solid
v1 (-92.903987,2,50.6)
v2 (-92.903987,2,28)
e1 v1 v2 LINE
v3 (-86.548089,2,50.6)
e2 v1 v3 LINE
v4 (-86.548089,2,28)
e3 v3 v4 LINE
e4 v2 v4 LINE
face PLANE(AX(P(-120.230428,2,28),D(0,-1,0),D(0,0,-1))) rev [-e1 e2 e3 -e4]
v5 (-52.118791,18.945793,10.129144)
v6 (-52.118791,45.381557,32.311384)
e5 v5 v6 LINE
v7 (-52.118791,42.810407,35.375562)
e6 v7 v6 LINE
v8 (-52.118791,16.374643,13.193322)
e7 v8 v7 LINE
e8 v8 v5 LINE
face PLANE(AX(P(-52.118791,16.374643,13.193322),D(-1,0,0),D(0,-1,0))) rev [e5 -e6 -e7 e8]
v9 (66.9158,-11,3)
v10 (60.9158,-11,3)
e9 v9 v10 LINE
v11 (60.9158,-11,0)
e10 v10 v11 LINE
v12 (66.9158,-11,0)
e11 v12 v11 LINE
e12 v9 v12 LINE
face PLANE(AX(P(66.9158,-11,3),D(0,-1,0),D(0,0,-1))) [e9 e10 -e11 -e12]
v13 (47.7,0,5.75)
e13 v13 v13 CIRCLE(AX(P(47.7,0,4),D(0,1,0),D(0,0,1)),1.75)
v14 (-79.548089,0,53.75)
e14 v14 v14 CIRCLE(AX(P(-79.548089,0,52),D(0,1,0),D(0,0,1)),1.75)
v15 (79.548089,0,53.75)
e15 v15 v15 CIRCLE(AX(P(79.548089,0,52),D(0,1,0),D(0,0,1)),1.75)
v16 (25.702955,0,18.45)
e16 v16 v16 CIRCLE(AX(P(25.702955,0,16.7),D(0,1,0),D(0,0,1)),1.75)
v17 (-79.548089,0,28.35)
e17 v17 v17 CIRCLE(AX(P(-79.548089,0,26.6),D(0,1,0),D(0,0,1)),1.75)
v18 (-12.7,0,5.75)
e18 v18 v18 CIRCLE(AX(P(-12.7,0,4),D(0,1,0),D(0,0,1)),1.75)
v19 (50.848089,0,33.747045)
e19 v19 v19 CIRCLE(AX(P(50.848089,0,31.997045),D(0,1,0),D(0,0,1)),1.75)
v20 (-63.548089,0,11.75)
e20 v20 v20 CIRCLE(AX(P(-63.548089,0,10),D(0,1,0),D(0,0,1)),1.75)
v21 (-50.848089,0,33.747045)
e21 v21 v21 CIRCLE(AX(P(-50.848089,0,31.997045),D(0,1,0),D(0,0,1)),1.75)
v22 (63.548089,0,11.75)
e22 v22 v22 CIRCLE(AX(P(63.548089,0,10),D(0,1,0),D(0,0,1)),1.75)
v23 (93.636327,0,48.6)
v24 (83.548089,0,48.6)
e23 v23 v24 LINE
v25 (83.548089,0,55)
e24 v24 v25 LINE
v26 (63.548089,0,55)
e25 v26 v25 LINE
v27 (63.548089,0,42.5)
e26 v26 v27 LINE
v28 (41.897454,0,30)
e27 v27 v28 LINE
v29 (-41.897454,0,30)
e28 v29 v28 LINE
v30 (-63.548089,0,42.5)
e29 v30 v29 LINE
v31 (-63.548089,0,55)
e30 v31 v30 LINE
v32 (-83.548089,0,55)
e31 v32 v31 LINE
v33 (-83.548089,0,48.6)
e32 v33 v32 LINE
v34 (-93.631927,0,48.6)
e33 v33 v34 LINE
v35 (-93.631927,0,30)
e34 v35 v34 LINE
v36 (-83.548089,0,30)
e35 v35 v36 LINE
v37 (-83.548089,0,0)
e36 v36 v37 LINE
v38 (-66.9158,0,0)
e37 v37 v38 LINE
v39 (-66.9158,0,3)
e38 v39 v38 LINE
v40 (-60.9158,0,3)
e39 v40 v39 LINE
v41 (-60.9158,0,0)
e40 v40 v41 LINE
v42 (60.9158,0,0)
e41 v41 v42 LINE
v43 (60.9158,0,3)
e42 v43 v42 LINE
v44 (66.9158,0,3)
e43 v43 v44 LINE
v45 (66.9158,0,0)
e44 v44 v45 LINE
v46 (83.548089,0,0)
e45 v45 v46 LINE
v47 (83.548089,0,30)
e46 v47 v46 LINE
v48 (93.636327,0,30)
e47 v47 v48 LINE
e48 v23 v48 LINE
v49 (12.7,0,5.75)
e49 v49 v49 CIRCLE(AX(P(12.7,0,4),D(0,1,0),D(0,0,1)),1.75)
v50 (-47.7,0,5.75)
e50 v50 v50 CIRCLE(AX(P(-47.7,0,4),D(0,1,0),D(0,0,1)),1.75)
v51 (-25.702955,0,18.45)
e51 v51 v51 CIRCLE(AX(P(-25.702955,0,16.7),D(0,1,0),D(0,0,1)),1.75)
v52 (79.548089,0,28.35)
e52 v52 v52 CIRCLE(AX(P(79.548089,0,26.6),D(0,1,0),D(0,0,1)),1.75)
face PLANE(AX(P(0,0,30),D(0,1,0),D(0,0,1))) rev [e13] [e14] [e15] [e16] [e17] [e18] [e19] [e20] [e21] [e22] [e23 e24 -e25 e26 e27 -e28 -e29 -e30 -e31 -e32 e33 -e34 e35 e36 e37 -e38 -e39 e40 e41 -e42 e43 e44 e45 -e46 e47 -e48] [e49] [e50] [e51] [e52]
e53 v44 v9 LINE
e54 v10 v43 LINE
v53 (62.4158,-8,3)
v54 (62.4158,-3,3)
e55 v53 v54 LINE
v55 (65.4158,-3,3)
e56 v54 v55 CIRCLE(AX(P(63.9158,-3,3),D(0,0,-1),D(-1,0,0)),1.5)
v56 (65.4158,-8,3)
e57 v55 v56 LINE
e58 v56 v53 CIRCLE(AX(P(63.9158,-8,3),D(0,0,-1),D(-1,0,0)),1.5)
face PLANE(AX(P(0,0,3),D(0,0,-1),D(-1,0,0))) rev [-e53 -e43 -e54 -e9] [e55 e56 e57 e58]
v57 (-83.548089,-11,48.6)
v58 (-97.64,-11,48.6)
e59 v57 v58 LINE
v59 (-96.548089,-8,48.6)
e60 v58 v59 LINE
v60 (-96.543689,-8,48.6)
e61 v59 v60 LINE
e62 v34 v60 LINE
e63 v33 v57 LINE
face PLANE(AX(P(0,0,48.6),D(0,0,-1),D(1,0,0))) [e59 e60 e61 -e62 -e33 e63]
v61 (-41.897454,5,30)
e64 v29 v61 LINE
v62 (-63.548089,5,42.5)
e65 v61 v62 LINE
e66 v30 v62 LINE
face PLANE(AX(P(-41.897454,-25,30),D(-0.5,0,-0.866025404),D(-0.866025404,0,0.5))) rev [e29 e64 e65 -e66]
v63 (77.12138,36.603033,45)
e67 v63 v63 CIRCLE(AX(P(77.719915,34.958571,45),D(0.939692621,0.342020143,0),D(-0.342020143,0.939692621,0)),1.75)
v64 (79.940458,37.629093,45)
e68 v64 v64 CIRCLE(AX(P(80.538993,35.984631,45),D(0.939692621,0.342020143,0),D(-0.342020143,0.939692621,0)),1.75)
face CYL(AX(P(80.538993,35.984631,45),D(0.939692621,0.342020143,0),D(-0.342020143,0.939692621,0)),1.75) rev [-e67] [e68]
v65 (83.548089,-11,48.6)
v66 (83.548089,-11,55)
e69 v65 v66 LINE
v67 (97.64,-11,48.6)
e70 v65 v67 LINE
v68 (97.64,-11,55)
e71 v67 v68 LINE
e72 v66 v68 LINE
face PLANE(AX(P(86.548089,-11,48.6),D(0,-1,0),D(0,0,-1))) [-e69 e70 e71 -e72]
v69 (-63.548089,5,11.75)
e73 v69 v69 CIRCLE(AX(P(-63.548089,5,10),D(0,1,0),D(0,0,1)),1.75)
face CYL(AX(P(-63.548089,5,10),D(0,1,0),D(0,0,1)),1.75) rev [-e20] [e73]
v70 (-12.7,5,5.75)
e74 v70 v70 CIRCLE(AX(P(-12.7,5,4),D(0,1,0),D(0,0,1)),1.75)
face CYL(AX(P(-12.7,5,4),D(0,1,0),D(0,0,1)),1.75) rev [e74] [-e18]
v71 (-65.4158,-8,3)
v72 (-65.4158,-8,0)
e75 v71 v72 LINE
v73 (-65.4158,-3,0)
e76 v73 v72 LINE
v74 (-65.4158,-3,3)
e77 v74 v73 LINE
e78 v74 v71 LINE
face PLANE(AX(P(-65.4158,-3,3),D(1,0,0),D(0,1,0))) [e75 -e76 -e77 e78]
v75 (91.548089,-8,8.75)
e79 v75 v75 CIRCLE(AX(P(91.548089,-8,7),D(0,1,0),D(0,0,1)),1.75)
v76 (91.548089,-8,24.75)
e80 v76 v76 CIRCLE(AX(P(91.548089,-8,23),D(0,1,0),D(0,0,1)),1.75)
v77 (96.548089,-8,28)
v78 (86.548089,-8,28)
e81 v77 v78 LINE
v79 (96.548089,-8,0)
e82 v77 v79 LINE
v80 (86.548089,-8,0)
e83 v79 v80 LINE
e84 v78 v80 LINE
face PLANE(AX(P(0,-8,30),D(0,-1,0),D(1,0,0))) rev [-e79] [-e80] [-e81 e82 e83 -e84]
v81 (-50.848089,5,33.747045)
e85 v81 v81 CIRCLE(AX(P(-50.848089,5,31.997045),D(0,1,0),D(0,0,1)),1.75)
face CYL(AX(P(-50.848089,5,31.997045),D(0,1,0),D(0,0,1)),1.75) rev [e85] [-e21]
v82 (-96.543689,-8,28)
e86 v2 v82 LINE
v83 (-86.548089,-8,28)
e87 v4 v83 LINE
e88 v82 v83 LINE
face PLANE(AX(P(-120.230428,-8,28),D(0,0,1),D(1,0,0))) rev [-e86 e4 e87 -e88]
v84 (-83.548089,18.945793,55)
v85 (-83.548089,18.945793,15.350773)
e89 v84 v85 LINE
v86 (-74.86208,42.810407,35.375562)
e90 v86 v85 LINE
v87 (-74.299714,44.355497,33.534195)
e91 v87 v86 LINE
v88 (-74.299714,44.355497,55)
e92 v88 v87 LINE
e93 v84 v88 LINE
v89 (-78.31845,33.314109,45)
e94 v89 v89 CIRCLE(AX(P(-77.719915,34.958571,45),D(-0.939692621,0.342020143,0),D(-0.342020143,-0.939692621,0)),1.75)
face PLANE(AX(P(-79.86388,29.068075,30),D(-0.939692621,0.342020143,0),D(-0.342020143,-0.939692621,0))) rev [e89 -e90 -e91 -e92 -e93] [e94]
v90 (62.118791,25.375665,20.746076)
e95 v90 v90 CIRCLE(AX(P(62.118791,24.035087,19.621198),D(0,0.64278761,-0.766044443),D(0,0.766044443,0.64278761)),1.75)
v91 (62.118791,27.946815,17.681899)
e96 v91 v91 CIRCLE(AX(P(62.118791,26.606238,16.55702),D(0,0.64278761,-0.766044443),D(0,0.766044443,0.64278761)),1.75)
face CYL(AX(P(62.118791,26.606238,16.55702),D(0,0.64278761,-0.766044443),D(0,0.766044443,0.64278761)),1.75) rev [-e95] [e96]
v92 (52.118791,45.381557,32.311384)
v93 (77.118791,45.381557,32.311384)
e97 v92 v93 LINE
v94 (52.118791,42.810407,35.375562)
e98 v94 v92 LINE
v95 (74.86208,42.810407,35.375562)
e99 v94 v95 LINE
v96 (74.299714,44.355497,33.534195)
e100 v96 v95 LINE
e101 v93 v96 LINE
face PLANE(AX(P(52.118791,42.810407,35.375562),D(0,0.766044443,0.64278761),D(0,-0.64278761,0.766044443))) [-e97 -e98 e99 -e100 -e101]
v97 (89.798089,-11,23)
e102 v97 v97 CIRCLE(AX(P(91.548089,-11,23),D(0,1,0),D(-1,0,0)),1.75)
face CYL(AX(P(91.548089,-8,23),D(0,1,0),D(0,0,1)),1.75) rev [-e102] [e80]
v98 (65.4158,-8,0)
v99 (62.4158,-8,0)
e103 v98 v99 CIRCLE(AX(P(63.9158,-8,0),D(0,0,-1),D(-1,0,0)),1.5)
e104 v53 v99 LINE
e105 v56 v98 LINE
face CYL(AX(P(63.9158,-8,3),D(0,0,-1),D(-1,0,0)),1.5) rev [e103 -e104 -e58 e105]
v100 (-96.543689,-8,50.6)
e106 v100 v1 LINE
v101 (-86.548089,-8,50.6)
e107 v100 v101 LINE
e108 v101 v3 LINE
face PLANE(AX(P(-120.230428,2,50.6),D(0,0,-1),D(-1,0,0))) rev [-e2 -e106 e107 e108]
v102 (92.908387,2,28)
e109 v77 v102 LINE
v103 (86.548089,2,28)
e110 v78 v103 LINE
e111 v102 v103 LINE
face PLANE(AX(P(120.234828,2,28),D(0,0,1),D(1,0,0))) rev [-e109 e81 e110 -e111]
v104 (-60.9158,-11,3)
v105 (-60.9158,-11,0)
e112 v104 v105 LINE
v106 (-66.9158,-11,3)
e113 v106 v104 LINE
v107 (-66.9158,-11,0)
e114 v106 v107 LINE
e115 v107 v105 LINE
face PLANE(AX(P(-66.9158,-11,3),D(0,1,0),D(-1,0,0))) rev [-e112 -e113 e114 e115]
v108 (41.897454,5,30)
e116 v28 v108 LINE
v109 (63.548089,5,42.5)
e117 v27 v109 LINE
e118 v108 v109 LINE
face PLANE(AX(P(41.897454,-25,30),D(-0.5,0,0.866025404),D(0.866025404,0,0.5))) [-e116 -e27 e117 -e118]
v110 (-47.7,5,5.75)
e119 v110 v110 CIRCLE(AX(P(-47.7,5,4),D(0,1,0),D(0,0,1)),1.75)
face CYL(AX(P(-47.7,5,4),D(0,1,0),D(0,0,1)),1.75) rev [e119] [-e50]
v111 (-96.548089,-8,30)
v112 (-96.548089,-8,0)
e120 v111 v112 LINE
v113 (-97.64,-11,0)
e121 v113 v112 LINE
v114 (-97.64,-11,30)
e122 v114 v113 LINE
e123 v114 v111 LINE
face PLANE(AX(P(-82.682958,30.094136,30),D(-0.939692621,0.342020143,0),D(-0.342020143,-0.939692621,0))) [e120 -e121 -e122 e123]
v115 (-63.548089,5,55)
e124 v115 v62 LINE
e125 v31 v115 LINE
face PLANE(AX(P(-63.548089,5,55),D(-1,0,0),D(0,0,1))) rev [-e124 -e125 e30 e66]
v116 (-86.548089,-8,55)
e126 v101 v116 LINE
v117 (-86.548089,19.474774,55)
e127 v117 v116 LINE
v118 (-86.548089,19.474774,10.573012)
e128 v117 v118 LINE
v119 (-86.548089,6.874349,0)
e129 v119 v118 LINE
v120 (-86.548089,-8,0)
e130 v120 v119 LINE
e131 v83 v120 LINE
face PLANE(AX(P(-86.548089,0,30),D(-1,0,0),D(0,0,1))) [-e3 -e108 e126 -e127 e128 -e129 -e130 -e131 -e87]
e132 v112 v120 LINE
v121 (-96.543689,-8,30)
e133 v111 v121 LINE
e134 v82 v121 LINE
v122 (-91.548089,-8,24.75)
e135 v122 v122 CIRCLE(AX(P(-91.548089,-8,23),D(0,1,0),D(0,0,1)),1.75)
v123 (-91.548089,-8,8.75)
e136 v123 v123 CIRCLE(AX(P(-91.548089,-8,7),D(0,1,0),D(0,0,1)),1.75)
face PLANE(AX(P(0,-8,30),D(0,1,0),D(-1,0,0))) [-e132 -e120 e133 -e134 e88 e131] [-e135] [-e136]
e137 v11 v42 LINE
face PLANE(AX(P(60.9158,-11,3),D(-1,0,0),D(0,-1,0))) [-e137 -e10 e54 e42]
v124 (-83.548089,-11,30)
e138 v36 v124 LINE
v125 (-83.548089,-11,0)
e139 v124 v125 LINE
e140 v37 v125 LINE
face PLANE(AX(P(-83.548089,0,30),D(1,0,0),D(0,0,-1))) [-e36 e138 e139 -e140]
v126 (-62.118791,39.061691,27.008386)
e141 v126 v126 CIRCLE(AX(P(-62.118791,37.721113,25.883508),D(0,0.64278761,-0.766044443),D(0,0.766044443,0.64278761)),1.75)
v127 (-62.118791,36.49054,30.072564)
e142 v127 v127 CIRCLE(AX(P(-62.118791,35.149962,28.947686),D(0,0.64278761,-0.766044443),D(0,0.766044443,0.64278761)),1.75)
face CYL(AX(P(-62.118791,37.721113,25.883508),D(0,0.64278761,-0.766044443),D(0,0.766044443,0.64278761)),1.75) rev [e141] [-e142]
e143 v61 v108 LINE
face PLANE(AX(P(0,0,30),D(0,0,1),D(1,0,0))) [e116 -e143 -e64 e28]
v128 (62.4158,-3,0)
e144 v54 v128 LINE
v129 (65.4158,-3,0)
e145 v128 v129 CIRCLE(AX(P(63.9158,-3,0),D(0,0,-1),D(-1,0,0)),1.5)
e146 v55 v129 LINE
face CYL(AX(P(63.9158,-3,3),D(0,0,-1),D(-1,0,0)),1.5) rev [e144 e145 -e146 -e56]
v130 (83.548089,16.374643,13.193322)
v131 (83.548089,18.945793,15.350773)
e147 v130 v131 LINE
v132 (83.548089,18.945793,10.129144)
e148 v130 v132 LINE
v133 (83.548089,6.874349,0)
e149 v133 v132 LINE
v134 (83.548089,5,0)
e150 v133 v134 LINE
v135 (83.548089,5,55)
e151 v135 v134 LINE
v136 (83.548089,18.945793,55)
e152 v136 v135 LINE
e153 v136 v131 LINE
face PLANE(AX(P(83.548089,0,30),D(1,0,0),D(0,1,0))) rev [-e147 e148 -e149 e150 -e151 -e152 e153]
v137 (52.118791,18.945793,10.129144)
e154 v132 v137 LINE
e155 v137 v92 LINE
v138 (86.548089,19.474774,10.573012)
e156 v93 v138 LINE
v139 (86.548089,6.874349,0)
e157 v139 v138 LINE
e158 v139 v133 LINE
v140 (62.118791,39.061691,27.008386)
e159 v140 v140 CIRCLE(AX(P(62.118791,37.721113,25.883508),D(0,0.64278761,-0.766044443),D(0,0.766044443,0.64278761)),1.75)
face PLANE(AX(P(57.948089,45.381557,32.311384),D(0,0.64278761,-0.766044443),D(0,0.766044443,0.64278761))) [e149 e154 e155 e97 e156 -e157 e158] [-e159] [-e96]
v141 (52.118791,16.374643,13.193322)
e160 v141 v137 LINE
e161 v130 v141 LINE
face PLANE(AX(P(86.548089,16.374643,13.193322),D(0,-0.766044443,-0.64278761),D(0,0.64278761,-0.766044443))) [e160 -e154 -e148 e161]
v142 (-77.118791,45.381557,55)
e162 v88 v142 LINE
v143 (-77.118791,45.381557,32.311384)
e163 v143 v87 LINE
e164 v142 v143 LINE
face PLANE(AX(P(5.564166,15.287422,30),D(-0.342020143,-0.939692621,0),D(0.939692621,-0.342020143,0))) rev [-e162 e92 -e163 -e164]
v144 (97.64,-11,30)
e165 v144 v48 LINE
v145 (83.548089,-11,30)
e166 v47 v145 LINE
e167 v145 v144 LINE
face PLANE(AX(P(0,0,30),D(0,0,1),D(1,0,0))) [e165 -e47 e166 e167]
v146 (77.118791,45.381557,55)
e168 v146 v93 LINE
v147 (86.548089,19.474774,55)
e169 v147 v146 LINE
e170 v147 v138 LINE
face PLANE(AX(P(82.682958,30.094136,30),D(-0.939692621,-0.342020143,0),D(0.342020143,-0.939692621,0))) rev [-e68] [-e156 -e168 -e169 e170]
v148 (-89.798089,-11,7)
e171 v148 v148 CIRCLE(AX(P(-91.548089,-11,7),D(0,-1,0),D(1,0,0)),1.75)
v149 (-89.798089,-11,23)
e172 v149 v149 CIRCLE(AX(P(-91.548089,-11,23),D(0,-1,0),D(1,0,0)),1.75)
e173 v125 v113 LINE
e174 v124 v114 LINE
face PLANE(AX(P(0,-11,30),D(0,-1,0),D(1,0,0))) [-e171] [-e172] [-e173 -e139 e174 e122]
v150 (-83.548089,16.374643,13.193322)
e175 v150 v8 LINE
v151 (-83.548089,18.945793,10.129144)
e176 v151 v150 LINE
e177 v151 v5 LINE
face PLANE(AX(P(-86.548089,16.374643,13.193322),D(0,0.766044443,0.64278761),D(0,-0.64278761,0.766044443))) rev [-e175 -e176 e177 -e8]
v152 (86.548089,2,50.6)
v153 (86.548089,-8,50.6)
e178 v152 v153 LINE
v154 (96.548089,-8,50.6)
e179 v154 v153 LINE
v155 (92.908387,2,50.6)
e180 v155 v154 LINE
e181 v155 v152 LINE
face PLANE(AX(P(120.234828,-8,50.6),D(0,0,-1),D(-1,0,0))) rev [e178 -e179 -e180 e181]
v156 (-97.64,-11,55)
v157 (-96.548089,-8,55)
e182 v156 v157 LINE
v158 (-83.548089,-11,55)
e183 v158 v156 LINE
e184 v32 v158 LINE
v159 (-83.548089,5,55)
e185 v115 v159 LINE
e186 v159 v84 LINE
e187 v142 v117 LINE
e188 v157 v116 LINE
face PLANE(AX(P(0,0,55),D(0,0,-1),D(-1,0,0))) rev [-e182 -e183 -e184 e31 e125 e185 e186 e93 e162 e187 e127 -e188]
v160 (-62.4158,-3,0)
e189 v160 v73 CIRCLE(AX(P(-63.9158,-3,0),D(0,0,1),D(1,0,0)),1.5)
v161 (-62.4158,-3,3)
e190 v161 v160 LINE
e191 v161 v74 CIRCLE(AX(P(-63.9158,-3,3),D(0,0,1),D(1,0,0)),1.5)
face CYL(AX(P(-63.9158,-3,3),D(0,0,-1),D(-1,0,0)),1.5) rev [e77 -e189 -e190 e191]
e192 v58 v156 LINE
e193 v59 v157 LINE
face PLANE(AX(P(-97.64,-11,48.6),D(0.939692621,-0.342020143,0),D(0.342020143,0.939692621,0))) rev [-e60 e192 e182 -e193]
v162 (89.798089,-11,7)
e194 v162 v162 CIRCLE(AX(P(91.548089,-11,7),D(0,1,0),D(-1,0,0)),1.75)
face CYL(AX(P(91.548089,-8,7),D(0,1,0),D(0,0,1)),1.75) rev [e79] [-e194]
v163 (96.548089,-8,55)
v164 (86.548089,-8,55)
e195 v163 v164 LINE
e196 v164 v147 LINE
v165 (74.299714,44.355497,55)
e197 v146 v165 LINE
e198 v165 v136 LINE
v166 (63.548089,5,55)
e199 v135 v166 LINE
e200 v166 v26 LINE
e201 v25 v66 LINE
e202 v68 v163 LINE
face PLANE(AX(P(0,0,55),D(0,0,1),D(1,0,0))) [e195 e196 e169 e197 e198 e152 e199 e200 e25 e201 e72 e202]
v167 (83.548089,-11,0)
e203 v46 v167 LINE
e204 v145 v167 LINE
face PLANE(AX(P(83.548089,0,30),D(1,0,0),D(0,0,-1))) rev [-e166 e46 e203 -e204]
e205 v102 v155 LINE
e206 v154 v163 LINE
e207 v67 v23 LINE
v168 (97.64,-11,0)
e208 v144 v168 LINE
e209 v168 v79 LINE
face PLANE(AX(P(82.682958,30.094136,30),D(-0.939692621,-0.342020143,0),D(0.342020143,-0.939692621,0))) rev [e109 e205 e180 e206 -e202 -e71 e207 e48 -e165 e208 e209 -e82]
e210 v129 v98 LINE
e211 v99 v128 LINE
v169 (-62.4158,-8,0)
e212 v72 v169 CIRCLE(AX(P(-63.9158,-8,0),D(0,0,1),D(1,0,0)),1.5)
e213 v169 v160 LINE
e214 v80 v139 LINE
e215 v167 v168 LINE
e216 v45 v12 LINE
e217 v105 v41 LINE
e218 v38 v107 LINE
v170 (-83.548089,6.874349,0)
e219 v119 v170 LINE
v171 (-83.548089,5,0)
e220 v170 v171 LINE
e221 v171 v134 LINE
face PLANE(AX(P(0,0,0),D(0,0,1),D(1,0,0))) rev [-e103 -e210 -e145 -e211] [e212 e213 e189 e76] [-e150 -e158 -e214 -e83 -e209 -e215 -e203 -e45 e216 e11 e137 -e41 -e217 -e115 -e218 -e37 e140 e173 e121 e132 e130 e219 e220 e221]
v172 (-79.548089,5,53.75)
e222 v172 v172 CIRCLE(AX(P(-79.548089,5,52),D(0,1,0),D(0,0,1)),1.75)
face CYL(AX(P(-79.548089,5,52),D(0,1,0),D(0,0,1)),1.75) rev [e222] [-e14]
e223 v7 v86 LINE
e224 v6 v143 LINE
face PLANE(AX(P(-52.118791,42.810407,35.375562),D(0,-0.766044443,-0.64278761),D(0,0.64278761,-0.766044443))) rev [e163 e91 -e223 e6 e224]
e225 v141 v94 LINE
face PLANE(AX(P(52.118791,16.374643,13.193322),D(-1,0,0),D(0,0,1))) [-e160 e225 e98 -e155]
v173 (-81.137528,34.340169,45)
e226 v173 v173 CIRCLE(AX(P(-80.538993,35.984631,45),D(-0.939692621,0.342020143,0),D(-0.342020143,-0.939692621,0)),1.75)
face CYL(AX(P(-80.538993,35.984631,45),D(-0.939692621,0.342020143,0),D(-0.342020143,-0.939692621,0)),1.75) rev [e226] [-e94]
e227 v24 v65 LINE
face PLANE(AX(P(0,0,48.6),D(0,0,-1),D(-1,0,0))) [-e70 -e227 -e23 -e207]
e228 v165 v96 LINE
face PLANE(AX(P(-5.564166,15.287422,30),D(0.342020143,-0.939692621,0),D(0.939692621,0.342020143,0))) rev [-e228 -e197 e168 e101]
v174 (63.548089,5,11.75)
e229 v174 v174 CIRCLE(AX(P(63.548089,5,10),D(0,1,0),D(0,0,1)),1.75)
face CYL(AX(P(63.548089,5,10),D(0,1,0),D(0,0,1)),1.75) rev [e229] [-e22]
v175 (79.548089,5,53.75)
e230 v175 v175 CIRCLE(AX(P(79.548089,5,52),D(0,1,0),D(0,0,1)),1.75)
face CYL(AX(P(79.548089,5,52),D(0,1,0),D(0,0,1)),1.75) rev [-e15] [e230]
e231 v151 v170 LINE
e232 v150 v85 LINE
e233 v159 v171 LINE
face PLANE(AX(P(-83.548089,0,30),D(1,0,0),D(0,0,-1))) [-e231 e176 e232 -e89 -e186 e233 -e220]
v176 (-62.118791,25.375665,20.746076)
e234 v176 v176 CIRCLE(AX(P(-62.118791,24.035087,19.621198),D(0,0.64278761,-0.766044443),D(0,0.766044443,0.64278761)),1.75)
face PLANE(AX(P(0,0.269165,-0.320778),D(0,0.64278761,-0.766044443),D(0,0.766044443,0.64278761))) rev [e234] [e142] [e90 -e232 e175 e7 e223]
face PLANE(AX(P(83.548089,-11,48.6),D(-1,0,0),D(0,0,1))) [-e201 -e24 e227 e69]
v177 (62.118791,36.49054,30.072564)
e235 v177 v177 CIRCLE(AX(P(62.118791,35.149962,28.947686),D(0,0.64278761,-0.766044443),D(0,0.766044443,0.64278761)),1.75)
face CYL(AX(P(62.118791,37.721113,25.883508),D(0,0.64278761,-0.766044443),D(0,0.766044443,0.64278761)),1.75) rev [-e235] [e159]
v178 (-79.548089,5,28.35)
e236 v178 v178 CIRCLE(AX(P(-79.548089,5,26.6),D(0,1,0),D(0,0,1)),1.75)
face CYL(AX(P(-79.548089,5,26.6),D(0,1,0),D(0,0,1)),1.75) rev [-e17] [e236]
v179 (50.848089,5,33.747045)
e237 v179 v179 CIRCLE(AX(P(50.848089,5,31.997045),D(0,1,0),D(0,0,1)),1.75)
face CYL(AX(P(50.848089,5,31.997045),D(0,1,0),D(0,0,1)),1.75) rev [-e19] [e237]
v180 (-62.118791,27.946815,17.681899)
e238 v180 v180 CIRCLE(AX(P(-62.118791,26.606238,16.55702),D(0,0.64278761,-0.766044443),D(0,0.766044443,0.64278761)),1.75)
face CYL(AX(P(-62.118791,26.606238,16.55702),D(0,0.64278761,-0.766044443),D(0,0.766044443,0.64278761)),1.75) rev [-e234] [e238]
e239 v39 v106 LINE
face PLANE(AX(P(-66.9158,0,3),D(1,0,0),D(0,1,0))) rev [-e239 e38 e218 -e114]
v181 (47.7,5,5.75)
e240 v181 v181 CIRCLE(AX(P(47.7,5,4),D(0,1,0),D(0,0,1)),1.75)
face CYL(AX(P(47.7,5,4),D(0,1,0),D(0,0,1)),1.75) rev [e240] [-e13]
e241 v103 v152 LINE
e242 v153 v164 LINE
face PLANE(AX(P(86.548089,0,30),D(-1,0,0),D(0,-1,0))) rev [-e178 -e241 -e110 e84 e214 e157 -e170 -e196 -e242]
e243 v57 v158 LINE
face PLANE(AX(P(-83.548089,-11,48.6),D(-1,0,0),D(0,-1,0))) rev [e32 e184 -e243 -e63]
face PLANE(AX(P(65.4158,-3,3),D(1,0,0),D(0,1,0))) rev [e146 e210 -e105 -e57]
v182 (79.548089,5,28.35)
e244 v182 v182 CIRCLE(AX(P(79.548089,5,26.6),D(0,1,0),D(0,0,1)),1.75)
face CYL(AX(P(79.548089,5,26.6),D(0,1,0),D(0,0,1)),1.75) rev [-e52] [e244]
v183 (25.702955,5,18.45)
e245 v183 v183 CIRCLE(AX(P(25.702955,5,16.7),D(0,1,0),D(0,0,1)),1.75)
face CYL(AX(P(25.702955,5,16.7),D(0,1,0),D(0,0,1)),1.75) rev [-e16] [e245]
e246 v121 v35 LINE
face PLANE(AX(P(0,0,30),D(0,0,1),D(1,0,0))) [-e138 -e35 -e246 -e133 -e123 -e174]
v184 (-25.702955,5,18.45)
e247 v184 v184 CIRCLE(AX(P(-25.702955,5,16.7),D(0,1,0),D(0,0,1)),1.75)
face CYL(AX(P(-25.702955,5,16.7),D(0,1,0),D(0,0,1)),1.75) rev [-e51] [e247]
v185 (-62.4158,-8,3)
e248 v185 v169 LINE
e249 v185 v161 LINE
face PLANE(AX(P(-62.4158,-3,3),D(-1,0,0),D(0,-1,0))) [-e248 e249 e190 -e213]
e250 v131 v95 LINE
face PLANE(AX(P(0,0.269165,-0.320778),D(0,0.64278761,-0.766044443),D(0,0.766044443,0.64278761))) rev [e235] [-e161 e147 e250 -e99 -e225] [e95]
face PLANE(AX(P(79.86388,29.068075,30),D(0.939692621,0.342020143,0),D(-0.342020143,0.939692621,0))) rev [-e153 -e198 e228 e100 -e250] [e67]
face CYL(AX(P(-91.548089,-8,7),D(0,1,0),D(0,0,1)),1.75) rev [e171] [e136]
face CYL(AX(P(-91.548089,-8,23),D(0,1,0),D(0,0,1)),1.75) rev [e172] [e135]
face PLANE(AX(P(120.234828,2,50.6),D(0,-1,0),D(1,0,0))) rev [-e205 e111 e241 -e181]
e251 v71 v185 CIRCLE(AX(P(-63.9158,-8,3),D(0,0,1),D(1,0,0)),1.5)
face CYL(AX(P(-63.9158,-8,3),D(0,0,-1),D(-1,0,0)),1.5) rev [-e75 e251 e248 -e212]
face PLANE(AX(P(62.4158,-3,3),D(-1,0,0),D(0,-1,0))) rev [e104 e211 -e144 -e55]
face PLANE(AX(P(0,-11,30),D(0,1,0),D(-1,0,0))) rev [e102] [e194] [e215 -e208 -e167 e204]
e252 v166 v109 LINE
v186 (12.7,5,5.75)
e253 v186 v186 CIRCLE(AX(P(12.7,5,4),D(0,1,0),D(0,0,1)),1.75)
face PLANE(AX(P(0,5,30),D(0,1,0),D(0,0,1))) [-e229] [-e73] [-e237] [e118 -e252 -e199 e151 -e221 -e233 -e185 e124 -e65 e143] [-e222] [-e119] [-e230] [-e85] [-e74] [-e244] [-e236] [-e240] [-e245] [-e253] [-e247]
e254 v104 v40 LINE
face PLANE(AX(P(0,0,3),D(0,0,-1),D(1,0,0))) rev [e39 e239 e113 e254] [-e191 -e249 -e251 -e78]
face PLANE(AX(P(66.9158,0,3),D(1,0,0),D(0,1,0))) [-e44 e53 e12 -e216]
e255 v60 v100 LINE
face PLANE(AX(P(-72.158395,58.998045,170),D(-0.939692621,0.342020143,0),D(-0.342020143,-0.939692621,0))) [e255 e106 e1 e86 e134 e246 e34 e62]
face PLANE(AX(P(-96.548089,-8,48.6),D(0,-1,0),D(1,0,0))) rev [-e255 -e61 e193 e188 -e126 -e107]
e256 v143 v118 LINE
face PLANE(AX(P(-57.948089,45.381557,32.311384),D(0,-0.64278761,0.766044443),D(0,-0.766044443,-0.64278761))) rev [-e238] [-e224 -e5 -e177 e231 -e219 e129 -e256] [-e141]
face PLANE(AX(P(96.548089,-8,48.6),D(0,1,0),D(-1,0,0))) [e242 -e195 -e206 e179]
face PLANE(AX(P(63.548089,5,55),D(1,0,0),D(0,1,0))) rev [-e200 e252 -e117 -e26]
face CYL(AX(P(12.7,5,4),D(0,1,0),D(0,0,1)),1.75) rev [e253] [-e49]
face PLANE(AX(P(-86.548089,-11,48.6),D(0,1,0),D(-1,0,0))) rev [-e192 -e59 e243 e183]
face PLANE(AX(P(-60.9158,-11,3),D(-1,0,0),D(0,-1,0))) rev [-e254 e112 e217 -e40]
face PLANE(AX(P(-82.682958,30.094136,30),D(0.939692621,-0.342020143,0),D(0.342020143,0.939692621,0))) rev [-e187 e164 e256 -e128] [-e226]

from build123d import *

# Parameters (mm, degrees)
BOSS_EXTRUDE1_DEPTH                 = 30
BOSS_EXTRUDE2_DEPTH                 = 25
CUT_EXTRUDE9_DEPTH                  = 28.6
BOSS_EXTRUDE10_DEPTH                = 4
F_3_5_3_5_DIAMETER_HOLE1_AT_2_COUNT = 2
F_3_5_3_5_DIAMETER_HOLE1_AT_2_PITCH = 14.509439018
F_3_5_3_5_DIAMETER_HOLE2_AT_2_COUNT = 2
F_3_5_3_5_DIAMETER_HOLE2_AT_2_PITCH = 16
F_4_0MM_DOWEL_HOLE1_D               = 3.5
BOSS_EXTRUDE11_DEPTH                = 6.4
F_4_0MM_DOWEL_HOLE2_D               = 3.5
F_4_0MM_DOWEL_HOLE2_DEPTH           = 5
F_3_0MM_DOWEL_HOLE1_D               = 3.5
BOSS_EXTRUDE13_DEPTH                = 5
F_3_0MM_DOWEL_HOLE2_D               = 3.5
F_3_0MM_DOWEL_HOLE2_DEPTH           = 5
BOSS_EXTRUDE14_START                = 28
BOSS_EXTRUDE14_DEPTH                = 22.6
BOSS_EXTRUDE14_2_DEPTH              = 2
BOSS_EXTRUDE14_START_2              = 48.6
BOSS_EXTRUDE14_3_DEPTH              = 2
BOSS_EXTRUDE15_START                = 28
BOSS_EXTRUDE15_DEPTH                = 22.6
BOSS_EXTRUDE15_2_DEPTH              = 2
BOSS_EXTRUDE15_START_2              = 48.6
BOSS_EXTRUDE15_3_DEPTH              = 2
SKETCH54_W                          = 6
SKETCH54_H                          = 11
BOSS_EXTRUDE16_DEPTH                = 3
CUT_EXTRUDE10_DEPTH                 = 3


# Read off the part's stored shape, not the designer's step: Boss-Extrude14, Boss-Extrude15
with BuildPart() as part:
    # Sketch1 → Boss-Extrude1 (new body)
    with BuildSketch(Plane.XY):
        Polygon((-83.548089297, 0), (83.548089297, 0), (83.548089297, -11), (97.64, -11), (96.548089297, -8), (86.548089297, -8), (86.548089297, 19.474774195), (77.1187914, 45.381557247), (74.299713538, 44.355496817), (83.548089297, 18.945793252), (83.548089297, 5), (-83.548089297, 5), (-83.548089297, 18.945793252), (-74.299713538, 44.355496817), (-77.1187914, 45.381557247), (-86.548089297, 19.474774195), (-86.548089297, -8), (-96.548089297, -8), (-97.64, -11), (-83.548089297, -11), align=None)
    extrude(amount=BOSS_EXTRUDE1_DEPTH)

    # Sketch2 → Boss-Extrude2 (add)
    with BuildSketch(Plane.XY.offset(30)):
        Polygon((-77.1187914, 45.381557247), (-74.299713538, 44.355496817), (-83.548089297, 18.945793252), (-83.548089297, 5), (-63.548089297, 5), (-63.548089297, 0), (-86.548089297, 0), (-86.548089297, 19.474774195), align=None)
        Polygon((77.1187914, 45.381557247), (74.299713538, 44.355496817), (83.548089297, 18.945793252), (83.548089297, 5), (63.548089297, 5), (63.548089297, 0), (86.548089297, 0), (86.548089297, 19.474774195), align=None)
    extrude(amount=BOSS_EXTRUDE2_DEPTH)

    # Sketch26 → Cut-Extrude9 (cut)
    with BuildSketch(Plane.ZY.offset(86.548089297)):
        Polygon((0, 45.381557247), (32.311383976, 45.381557247), (0, 6.874349312), align=None)
    cut_extrude9 = extrude(amount=-CUT_EXTRUDE9_DEPTH, mode=Mode.SUBTRACT)

    # Mirror1: Cut-Extrude9 across plane
    add(cut_extrude9.mirror(Plane.ZY), mode=Mode.SUBTRACT)

    # Sketch27 → Boss-Extrude10 (add)
    with BuildSketch(Plane(origin=(0, 2.840315541, -3.38495625), x_dir=(-1, 0, 0), z_dir=(0, 0.6427876096865439, -0.7660444431189742))):
        Polygon((-86.548089297, 21.024208003), (-52.1187914, 21.024208003), (-52.1187914, 55.533647021), (-77.1187914, 55.533647021), align=None)
    boss_extrude10 = extrude(amount=-BOSS_EXTRUDE10_DEPTH)

    # Sketch32 → Ø3.5 (3.5) Diameter Hole1 (revolve, cut)
    with BuildSketch(Plane(origin=(62.1187914, 37.721112816, 25.883507879), x_dir=(0, 0.7660444431189745, 0.6427876096865438), z_dir=(1, 0, 0))):
        Polygon((0, 0), (0, 6.051506083), (1.75, 5), (1.75, 0), align=None)
    f_3_5_3_5_diameter_hole1 = revolve(axis=Axis((62.1187914, 41.802814137, 21.019125665), (0, -0.6427876096865437, 0.7660444431189743)), mode=Mode.SUBTRACT)

    # Ø3.5 (3.5) Diameter Hole1 at 2: Ø3.5 (3.5) Diameter Hole1 ×2
    with Locations(*[Vector(0, -0.7660444431189745, -0.6427876096865437) * (i * F_3_5_3_5_DIAMETER_HOLE1_AT_2_PITCH) for i in range(1, F_3_5_3_5_DIAMETER_HOLE1_AT_2_COUNT)]):
        add(f_3_5_3_5_diameter_hole1, mode=Mode.SUBTRACT)

    # Mirror12: Boss-Extrude10, Ø3.5 (3.5) Diameter Hole1 across plane
    add(boss_extrude10.mirror(Plane.ZY))
    add(f_3_5_3_5_diameter_hole1.mirror(Plane.ZY), mode=Mode.SUBTRACT)

    # Mirror12 copy 1 sketch → Mirror12 copy 1 (revolve, cut)
    with BuildSketch(Plane(origin=(-62.1187914, 26.606237684, 16.557020255), x_dir=(0, 0.7660444431189745, 0.6427876096865438), z_dir=(-1, 0, 0))):
        Polygon((0, 0), (0, -6.051506083), (1.75, -5), (1.75, 0), align=None)
    revolve(axis=Axis((-62.1187914, 30.687939005, 11.692638041), (0, 0.6427876096865437, -0.7660444431189743)), mode=Mode.SUBTRACT)

    # Sketch36 → Ø3.5 (3.5) Diameter Hole2 (revolve, cut)
    with BuildSketch(Plane(origin=(91.548089297, -8, 7), x_dir=(0, 0, 1), z_dir=(1, 0, 0))):
        Polygon((0, 0), (0, 6.051506083), (1.75, 5), (1.75, 0), align=None)
    f_3_5_3_5_diameter_hole2 = revolve(axis=Axis((91.548089297, -1.65, 7), (0, -1, 0)), mode=Mode.SUBTRACT)

    # Ø3.5 (3.5) Diameter Hole2 at 2: Ø3.5 (3.5) Diameter Hole2 ×2
    with Locations(*[(0, 0, i * F_3_5_3_5_DIAMETER_HOLE2_AT_2_PITCH) for i in range(1, F_3_5_3_5_DIAMETER_HOLE2_AT_2_COUNT)]):
        add(f_3_5_3_5_diameter_hole2, mode=Mode.SUBTRACT)

    # Mirror13: Ø3.5 (3.5) Diameter Hole2 across plane
    add(f_3_5_3_5_diameter_hole2.mirror(Plane.ZY), mode=Mode.SUBTRACT)

    # Mirror13 copy 1 sketch → Mirror13 copy 1 (revolve, cut)
    with BuildSketch(Plane(origin=(-91.548089297, -8, 23), x_dir=(0, 0, 1), z_dir=(-1, 0, 0))):
        Polygon((0, 0), (0, -6.051506083), (1.75, -5), (1.75, 0), align=None)
    revolve(axis=Axis((-91.548089297, -1.65, 23), (0, 1, 0)), mode=Mode.SUBTRACT)

    # Sketch37 → Ø3.5 (3.5) Diameter Hole3 (revolve, cut)
    with BuildSketch(Plane(origin=(80.538992834, 35.984631039, 45), x_dir=(-0.342020143325673, 0.9396926207859069, 0), z_dir=(0, 0, 1))):
        Polygon((0, 0), (0, 6.051506083), (1.75, 5), (1.75, 0), align=None)
    f_3_5_3_5_diameter_hole3 = revolve(axis=Axis((86.506040976, 38.156458949, 45), (-0.9396926207859069, -0.34202014332567293, 0)), mode=Mode.SUBTRACT)

    # Mirror14: Ø3.5 (3.5) Diameter Hole3 across plane
    add(f_3_5_3_5_diameter_hole3.mirror(Plane.ZY), mode=Mode.SUBTRACT)

    # Ø4.0mm Dowel Hole1 (through all)
    with Locations(Plane(origin=(0, 5, 0), x_dir=(1, 0, 0), z_dir=(0, 1, 0))):
        with Locations((-12.7, -4), (12.7, -4)):
            Hole(F_4_0MM_DOWEL_HOLE1_D / 2)

    # Sketch44 → Boss-Extrude11 (add)
    with BuildSketch(Plane.XY.offset(55)):
        Polygon((86.548089297, 0), (86.548089297, -8), (96.548089297, -8), (97.64, -11), (86.548089297, -11), (83.548089297, -11), (83.548089297, 5), (86.548089297, 5), align=None)
    boss_extrude11 = extrude(amount=-BOSS_EXTRUDE11_DEPTH)

    # Mirror15: Boss-Extrude11 across plane
    add(boss_extrude11.mirror(Plane.ZY))

    # Ø4.0mm Dowel Hole2
    with Locations(Plane(origin=(0, 5, 0), x_dir=(1, 0, 0), z_dir=(0, 1, 0))):
        with Locations((79.548089297, -52), (79.548089297, -26.6)):
            f_4_0mm_dowel_hole2 = Hole(F_4_0MM_DOWEL_HOLE2_D / 2, depth=F_4_0MM_DOWEL_HOLE2_DEPTH)

    # Ø3.0mm Dowel Hole1 (through all)
    with Locations(Plane(origin=(0, 5, 0), x_dir=(1, 0, 0), z_dir=(0, 1, 0))):
        with Locations((47.7, -4), (25.702954744, -16.7)):
            f_3_0mm_dowel_hole1 = Hole(F_3_0MM_DOWEL_HOLE1_D / 2)

    # Mirror17: Ø4.0mm Dowel Hole2, Ø3.0mm Dowel Hole1 across plane
    add(f_4_0mm_dowel_hole2.mirror(Plane.ZY), mode=Mode.SUBTRACT)
    add(f_3_0mm_dowel_hole1.mirror(Plane.ZY), mode=Mode.SUBTRACT)

    # Sketch49 → Boss-Extrude13 (add)
    with BuildSketch(Plane(origin=(0, 5, 0), x_dir=(1, 0, 0), z_dir=(0, 1, 0))):
        Polygon((-41.897454203, -30), (-63.548089297, -42.5), (-63.548089297, -30), align=None)
    boss_extrude13 = extrude(amount=-BOSS_EXTRUDE13_DEPTH)

    # Mirror18: Boss-Extrude13 across plane
    add(boss_extrude13.mirror(Plane.ZY))

    # Ø3.0mm Dowel Hole2
    with Locations(Plane(origin=(0, 5, 0), x_dir=(1, 0, 0), z_dir=(0, 1, 0))):
        with Locations((-63.548089297, -10), (-50.848089297, -31.997045256)):
            f_3_0mm_dowel_hole2 = Hole(F_3_0MM_DOWEL_HOLE2_D / 2, depth=F_3_0MM_DOWEL_HOLE2_DEPTH)

    # Mirror19: Ø3.0mm Dowel Hole2 across plane
    add(f_3_0mm_dowel_hole2.mirror(Plane.ZY), mode=Mode.SUBTRACT)

    # Boss-Extrude14 outline → Boss-Extrude14 (add)
    with BuildSketch(Plane.XY.offset(BOSS_EXTRUDE14_START)):
        Polygon((93.636327423, 0), (92.908386955, 2), (86.548089297, 2), (86.548089297, 0), align=None)
    extrude(amount=BOSS_EXTRUDE14_DEPTH)

    # Boss-Extrude14 2 outline → Boss-Extrude14 2 (add)
    with BuildSketch(Plane.XY.offset(BOSS_EXTRUDE14_START)):
        Polygon((96.548089297, -8), (93.636327423, 0), (86.548089297, 0), (86.548089297, -8), align=None)
    extrude(amount=BOSS_EXTRUDE14_2_DEPTH)

    # Boss-Extrude14 3 outline → Boss-Extrude14 3 (add)
    with BuildSketch(Plane.XY.offset(BOSS_EXTRUDE14_START_2)):
        Polygon((96.548089297, -8), (93.636327423, 0), (86.548089297, 0), (86.548089297, -8), align=None)
    extrude(amount=BOSS_EXTRUDE14_3_DEPTH)

    # Boss-Extrude15 outline → Boss-Extrude15 (add)
    with BuildSketch(Plane.XY.offset(BOSS_EXTRUDE15_START)):
        Polygon((-86.548089297, 2), (-92.903986965, 2), (-93.631927434, 0), (-86.548089297, 0), align=None)
    extrude(amount=BOSS_EXTRUDE15_DEPTH)

    # Boss-Extrude15 2 outline → Boss-Extrude15 2 (add)
    with BuildSketch(Plane.XY.offset(BOSS_EXTRUDE15_START)):
        Polygon((-86.548089297, 0), (-93.631927434, 0), (-96.543689308, -8), (-86.548089297, -8), align=None)
    extrude(amount=BOSS_EXTRUDE15_2_DEPTH)

    # Boss-Extrude15 3 outline → Boss-Extrude15 3 (add)
    with BuildSketch(Plane.XY.offset(BOSS_EXTRUDE15_START_2)):
        Polygon((-86.548089297, 0), (-93.631927434, 0), (-96.543689308, -8), (-86.548089297, -8), align=None)
    extrude(amount=BOSS_EXTRUDE15_3_DEPTH)

    # Sketch54 → Boss-Extrude16 (add)
    with BuildSketch(Plane(origin=(0, 0, 0), x_dir=(-1, 0, 0), z_dir=(0, 0, -1))):
        with Locations((-63.915800061, -5.5)):
            Rectangle(SKETCH54_W, SKETCH54_H)
    boss_extrude16 = extrude(amount=-BOSS_EXTRUDE16_DEPTH)

    # Sketch55 → Cut-Extrude10 (cut)
    with BuildSketch(Plane(origin=(0, 0, 0), x_dir=(-1, 0, 0), z_dir=(0, 0, -1))):
        with BuildLine():
            Line((-62.415800061, -3), (-62.415800061, -8))
            ThreePointArc((-62.415800061, -8), (-63.915800061, -9.5), (-65.415800061, -8))
            Line((-65.415800061, -8), (-65.415800061, -3))
            ThreePointArc((-65.415800061, -3), (-63.915800061, -1.5), (-62.415800061, -3))
        make_face()
    cut_extrude10 = extrude(amount=-CUT_EXTRUDE10_DEPTH, mode=Mode.SUBTRACT)

    # Mirror20: Boss-Extrude16, Cut-Extrude10 across plane
    add(boss_extrude16.mirror(Plane.ZY))
    add(cut_extrude10.mirror(Plane.ZY), mode=Mode.SUBTRACT)


solid = part.part
